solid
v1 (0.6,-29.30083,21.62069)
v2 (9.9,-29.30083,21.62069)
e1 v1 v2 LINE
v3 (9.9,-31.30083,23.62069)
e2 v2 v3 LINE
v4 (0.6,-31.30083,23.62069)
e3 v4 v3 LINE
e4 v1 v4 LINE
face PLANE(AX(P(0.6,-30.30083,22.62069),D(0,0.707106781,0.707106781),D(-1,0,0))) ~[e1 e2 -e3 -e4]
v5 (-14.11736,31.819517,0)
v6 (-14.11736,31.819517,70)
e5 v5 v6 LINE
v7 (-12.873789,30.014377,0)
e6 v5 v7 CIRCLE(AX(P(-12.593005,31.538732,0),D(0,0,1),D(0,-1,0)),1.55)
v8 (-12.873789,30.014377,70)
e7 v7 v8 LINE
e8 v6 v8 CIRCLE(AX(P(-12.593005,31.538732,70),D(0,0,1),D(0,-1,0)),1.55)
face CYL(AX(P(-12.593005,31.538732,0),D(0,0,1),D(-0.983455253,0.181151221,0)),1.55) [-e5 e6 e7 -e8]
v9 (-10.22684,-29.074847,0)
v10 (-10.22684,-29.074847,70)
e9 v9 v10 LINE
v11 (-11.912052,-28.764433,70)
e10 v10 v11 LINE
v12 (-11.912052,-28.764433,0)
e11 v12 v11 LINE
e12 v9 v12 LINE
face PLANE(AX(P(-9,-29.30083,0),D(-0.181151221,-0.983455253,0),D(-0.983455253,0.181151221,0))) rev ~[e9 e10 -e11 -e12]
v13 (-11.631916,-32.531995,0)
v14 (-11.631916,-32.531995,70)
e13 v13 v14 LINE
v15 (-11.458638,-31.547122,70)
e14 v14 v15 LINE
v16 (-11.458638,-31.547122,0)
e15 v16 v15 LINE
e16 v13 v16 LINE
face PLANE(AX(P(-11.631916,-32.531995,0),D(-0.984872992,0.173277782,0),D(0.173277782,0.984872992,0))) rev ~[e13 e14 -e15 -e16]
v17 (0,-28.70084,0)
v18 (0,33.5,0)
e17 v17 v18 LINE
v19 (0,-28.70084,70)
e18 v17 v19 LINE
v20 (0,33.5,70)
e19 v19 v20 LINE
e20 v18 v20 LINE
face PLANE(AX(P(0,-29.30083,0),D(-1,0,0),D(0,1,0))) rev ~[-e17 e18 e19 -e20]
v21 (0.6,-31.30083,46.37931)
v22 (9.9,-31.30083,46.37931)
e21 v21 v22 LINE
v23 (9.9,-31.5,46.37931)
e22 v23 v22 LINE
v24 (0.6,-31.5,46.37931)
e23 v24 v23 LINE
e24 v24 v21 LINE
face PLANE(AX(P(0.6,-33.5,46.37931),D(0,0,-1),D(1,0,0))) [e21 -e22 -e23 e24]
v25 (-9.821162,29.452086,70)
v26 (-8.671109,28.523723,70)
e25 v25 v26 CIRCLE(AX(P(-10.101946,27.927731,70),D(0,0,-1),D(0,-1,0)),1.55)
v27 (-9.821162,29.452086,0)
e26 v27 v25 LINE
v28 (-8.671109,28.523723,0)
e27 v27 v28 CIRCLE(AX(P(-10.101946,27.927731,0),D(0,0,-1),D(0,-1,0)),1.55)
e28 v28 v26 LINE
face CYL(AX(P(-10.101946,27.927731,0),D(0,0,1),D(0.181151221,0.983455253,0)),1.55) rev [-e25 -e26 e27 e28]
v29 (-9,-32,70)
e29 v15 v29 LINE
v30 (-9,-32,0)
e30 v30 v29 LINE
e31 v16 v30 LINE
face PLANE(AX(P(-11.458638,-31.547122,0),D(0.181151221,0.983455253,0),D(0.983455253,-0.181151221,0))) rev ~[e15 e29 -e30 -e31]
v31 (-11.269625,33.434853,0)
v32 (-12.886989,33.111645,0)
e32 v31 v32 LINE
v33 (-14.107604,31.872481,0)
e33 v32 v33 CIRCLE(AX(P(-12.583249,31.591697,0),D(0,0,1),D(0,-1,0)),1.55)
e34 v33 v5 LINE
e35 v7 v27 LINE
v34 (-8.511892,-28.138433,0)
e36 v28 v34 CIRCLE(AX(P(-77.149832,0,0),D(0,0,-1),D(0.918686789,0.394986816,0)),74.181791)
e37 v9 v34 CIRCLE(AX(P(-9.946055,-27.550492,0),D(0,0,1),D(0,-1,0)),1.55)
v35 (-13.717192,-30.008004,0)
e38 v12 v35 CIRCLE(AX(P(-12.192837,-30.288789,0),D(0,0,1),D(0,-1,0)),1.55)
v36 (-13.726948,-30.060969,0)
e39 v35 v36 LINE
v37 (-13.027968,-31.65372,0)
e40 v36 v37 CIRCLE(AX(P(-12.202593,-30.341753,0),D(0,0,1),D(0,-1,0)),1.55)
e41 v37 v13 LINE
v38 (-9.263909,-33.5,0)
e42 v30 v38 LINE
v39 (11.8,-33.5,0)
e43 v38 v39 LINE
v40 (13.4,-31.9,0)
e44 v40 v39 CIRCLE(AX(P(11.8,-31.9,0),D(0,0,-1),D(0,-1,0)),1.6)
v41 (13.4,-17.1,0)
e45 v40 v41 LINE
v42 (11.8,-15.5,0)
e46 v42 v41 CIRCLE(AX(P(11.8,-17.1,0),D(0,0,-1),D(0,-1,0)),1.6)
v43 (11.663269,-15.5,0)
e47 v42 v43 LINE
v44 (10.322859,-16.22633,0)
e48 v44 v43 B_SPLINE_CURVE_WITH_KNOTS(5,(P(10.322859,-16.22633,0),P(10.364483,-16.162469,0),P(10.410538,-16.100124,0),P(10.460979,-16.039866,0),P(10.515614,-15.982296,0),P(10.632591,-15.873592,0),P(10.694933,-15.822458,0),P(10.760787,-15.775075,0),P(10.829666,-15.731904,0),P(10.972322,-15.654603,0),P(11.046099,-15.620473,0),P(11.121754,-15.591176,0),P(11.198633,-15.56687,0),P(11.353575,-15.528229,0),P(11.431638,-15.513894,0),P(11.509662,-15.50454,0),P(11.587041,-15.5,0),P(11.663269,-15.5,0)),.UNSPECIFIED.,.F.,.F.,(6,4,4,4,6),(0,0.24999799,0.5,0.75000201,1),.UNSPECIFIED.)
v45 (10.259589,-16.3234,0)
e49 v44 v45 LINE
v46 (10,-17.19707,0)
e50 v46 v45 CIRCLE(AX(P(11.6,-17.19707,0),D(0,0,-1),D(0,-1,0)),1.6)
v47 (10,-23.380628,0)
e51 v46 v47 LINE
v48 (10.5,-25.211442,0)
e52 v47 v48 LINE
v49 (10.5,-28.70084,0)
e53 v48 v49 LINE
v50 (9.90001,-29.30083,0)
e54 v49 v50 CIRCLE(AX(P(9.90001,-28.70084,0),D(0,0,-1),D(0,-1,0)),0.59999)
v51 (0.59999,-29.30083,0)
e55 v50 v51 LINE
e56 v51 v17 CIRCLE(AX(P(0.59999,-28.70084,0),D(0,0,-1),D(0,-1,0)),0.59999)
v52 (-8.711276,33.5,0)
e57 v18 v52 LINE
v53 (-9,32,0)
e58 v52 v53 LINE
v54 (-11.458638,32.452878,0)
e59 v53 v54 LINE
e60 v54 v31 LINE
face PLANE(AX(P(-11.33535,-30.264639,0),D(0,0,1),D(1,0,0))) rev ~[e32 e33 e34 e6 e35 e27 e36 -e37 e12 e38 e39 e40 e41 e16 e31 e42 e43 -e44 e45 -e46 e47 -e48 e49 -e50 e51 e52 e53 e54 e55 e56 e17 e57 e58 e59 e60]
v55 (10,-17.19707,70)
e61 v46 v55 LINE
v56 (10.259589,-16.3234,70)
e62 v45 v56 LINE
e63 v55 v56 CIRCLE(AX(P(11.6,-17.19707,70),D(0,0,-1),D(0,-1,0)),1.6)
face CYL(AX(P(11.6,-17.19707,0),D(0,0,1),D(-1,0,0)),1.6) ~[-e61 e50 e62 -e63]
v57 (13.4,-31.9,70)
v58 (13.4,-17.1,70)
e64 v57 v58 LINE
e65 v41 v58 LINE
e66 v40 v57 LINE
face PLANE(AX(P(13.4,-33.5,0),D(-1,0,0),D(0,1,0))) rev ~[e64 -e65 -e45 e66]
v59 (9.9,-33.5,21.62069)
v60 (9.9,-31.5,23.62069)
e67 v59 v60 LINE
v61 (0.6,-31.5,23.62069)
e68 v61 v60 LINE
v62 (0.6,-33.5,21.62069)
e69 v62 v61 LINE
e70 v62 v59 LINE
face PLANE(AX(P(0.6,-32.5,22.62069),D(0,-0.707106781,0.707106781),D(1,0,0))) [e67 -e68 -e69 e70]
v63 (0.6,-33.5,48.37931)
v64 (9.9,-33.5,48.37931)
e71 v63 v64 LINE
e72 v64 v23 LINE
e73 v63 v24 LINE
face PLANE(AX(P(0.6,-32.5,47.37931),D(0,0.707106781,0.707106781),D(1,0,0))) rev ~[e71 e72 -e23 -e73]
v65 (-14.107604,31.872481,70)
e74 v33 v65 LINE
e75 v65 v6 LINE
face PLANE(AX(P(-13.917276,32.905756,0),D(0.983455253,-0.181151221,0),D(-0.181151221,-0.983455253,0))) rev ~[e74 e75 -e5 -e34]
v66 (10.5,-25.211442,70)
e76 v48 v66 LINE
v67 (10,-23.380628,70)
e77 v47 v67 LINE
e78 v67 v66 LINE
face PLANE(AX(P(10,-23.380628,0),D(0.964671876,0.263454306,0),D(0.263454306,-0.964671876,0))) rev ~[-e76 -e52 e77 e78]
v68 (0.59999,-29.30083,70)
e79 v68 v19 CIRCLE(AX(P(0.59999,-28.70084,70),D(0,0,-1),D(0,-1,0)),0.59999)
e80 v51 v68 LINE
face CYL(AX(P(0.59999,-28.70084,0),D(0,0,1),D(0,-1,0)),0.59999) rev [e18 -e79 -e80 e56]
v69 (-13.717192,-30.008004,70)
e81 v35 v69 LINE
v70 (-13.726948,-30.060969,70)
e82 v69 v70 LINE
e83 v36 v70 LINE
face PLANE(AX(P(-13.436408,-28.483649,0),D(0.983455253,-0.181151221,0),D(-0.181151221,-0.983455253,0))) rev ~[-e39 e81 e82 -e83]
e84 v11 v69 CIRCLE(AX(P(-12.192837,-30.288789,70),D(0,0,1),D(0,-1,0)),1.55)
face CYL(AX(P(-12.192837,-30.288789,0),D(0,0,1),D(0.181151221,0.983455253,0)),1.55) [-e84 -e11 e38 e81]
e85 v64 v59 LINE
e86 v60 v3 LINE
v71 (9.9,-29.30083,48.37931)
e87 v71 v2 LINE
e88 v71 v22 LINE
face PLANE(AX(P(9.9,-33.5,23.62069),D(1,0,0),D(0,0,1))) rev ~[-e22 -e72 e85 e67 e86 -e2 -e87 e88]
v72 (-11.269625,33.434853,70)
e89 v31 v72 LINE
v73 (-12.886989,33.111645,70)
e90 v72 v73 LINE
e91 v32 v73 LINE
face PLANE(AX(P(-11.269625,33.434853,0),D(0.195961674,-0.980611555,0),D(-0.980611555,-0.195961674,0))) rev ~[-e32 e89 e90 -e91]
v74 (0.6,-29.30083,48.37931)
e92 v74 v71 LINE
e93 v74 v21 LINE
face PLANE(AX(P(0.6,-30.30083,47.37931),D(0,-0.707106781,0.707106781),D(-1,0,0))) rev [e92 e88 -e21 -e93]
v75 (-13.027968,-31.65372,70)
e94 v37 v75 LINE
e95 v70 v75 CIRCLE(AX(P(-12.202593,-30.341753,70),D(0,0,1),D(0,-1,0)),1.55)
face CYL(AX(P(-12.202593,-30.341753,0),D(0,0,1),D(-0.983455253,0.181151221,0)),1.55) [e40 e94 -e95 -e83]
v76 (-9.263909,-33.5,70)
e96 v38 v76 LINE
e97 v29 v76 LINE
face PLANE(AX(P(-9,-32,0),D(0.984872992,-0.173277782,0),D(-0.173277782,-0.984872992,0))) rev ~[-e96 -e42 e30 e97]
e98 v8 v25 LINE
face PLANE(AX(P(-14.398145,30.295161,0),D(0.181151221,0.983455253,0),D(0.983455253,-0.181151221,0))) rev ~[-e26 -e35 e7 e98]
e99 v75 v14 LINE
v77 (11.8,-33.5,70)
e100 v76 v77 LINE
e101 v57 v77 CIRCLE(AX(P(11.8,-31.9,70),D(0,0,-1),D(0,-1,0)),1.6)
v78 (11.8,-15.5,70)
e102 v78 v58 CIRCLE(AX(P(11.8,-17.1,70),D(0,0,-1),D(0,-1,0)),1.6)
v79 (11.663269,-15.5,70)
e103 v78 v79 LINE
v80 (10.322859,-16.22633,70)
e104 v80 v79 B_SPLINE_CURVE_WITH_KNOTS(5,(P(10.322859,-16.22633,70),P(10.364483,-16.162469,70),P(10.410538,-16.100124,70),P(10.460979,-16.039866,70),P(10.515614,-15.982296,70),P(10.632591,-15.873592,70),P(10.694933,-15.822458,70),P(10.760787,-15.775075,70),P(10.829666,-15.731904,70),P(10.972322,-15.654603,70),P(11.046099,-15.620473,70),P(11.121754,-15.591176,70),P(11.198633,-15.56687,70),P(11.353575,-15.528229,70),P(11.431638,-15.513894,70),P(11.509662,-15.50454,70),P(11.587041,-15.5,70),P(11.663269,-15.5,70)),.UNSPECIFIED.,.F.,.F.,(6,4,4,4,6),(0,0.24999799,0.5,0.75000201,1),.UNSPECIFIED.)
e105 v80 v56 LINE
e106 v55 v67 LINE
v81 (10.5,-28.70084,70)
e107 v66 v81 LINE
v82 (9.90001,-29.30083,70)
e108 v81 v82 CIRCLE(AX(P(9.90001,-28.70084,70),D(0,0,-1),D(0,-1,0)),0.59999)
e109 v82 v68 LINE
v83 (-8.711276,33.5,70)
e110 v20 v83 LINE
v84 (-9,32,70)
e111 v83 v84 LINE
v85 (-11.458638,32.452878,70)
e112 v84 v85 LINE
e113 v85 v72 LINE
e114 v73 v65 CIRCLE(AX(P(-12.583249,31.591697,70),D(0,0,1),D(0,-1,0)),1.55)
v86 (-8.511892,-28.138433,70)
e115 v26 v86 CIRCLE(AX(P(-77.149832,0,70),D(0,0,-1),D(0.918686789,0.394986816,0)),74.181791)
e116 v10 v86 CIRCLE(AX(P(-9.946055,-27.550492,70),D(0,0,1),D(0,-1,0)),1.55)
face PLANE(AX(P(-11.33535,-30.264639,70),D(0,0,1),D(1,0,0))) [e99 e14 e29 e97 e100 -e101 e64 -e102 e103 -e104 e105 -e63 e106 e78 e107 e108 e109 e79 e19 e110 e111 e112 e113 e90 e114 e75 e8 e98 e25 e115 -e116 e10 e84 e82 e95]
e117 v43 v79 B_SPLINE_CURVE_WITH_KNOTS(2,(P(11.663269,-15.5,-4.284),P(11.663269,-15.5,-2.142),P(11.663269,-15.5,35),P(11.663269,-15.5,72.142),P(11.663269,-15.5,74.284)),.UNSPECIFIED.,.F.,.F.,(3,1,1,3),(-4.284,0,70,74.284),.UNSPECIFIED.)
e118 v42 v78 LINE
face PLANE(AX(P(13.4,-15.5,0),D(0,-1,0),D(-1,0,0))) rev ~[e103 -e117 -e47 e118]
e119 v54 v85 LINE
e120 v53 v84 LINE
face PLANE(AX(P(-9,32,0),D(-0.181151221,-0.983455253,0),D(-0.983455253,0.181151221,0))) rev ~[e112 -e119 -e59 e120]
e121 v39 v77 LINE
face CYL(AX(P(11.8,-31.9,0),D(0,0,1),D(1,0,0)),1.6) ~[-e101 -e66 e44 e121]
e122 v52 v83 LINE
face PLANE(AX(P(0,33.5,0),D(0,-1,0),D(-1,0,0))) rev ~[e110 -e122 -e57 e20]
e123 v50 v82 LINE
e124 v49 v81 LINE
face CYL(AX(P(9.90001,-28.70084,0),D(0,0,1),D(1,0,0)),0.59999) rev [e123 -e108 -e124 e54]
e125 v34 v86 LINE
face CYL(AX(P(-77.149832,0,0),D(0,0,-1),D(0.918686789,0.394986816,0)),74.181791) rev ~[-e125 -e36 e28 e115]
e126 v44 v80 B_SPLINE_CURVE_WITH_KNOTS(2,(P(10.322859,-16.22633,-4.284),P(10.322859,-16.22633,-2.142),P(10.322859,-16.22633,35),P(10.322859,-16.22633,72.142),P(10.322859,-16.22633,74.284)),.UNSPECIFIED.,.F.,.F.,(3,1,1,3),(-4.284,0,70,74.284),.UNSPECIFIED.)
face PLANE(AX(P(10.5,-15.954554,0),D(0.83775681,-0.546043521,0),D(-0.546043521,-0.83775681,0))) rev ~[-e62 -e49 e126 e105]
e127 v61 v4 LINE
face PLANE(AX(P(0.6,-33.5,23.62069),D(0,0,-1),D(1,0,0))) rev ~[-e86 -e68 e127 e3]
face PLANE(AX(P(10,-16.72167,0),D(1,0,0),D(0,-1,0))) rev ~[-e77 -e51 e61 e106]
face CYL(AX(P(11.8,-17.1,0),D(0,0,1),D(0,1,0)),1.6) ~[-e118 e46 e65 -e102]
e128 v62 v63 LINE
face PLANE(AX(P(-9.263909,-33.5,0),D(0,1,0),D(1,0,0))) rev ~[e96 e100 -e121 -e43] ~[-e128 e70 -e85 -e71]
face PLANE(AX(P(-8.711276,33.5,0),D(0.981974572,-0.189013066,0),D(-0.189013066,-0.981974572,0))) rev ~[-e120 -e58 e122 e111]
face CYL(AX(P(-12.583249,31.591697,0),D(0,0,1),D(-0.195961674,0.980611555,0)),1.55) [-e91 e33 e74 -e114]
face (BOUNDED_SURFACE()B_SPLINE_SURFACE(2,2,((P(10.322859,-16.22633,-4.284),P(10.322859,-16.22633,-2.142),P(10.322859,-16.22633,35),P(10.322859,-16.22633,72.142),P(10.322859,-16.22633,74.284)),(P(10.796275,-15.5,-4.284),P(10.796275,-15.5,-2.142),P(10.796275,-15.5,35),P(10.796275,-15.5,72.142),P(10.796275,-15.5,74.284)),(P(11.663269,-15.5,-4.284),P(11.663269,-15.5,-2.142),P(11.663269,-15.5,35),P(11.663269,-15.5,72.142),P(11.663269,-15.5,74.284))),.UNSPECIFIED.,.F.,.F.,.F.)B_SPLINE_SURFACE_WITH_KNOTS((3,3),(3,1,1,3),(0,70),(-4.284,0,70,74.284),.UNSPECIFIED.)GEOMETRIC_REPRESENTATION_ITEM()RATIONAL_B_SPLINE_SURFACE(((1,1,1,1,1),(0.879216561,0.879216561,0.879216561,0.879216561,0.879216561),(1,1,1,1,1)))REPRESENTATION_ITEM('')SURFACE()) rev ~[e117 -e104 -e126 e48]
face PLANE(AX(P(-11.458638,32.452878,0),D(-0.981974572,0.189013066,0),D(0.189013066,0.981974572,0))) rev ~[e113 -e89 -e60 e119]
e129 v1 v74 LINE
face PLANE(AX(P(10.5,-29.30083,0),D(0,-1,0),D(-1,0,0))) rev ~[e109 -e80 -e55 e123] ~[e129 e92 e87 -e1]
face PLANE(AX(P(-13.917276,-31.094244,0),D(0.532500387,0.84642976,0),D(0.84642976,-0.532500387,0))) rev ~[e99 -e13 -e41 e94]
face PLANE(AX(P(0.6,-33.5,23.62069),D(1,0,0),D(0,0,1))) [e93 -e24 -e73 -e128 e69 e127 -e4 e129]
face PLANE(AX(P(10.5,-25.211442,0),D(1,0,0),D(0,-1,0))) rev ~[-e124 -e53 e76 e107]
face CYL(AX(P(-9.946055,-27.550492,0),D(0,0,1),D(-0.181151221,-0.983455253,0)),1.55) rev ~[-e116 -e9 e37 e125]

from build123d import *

# Parameters (mm, degrees)
F0_W     = 9
F0_H     = 2.6991704602
F0_H_2   = 1.5
F1_DEPTH = 70
F2_R     = 1.55
F3_W     = 9.3
F3_H     = 22.7586206897
F4_DEPTH = 5
F5_SIZE  = 2
F6_R     = 0.59999
F7_R     = 1.6


# Not quite as in the source:
# - a fillet or chamfer is up to 0.001 mm smaller than in the source, because OpenCascade refuses the exact size
# - a feature names something its author has since deleted; it is built from what else it names


with BuildPart() as f1:
    # F0 (on Top) → F1 (new body)
    with BuildSketch(Plane.XY):
        Polygon((-9, -32), (-9, -29.3008295398), (-13.4364079285, -28.4836487781), (-13.9172762663, -31.0942438952), (-11.4586381331, -31.5471219476), align=None)
        with Locations((-4.5, -30.6504147699)):
            Rectangle(F0_W, F0_H)
        Polygon((-9, -33.5), (-9, -32), (-9.2639088239, -33.5), align=None)
        with Locations((-4.5, -32.75)):
            Rectangle(F0_W, F0_H_2)
        Polygon((-11.6319159151, -32.5319949396), (-11.4586381331, -31.5471219476), (-13.9172762663, -31.0942438952), align=None)
        with BuildLine():
            Line((0, -29.3008295398), (0, 29.3008295398))
            Line((0, 29.3008295398), (-9, 29.3008295398))
            ThreePointArc((-9, 29.3008295398), (-2.9680403173, 0), (-9, -29.3008295398))
            Line((-9, -29.3008295398), (0, -29.3008295398))
        make_face()
        with Locations((-4.5, 30.6504147699)):
            Rectangle(F0_W, F0_H)
        Polygon((0, 32), (0, 33.5), (-8.7112760279, 33.5), (-9, 32), align=None)
        Polygon((-9, 29.3008295398), (-9, 32), (-11.4586381331, 32.4528780524), (-13.9172762663, 32.9057561048), (-14.398144604, 30.2951609877), align=None)
        Polygon((-13.9172762663, 32.9057561048), (-11.4586381331, 32.4528780524), (-11.2696250671, 33.4348526248), align=None)
        Polygon((10.5, -29.3008295398), (0, -29.3008295398), (0, -32), (0, -33.5), (13.4, -33.5), (13.4, -15.5), (10.7962751514, -15.5), (10.5, -15.9545544746), (10.5, -22.238118574), (10.5, -25.2114422619), align=None)
        Polygon((10, -23.3806278557), (10.5, -25.2114422619), (10.5, -22.238118574), (10.5, -15.9545544746), (10, -16.7216698947), align=None)
    extrude(amount=F1_DEPTH)

    # F2
    f2_edges = [f1.edges().sort_by_distance(p)[0] for p in [
        (-14.398145, 30.295161, 35),
        (-9, 29.30083, 35),
        (-13.436408, -28.483649, 35),
        (-9, -29.30083, 35),
        (-13.917276, -31.094244, 35),
        (-13.917276, 32.905756, 35),
    ]]
    fillet(f2_edges, radius=F2_R)

    # F3 (on face) → F4 (cut)
    with BuildSketch(Plane.XZ.offset(33.5)):
        with Locations((5.25, 35)):
            Rectangle(F3_W, F3_H)
    extrude(amount=-F4_DEPTH, mode=Mode.SUBTRACT)

    # F5
    f5_edges = [f1.edges().sort_by_distance(p)[0] for p in [
        (5.25, -33.5, 46.37931),
        (5.25, -33.5, 23.62069),
        (5.25, -29.30083, 23.62069),
        (5.25, -29.30083, 46.37931),
    ]]
    chamfer(f5_edges, length=F5_SIZE)

    # F6 (radius 0.6 in the source; OpenCascade refuses exactly that, so slightly less here)
    f6_edges = [f1.edges().sort_by_distance(p)[0] for p in [
        (0, -29.30083, 35),
        (10.5, -29.30083, 35),
    ]]
    fillet(f6_edges, radius=F6_R)

    # F7
    f7_edges = [f1.edges().sort_by_distance(p)[0] for p in [
        (10.796275, -15.5, 35),
        (13.4, -15.5, 35),
        (10, -16.72167, 35),
        (13.4, -33.5, 35),
    ]]
    fillet(f7_edges, radius=F7_R)


solid = f1.part
